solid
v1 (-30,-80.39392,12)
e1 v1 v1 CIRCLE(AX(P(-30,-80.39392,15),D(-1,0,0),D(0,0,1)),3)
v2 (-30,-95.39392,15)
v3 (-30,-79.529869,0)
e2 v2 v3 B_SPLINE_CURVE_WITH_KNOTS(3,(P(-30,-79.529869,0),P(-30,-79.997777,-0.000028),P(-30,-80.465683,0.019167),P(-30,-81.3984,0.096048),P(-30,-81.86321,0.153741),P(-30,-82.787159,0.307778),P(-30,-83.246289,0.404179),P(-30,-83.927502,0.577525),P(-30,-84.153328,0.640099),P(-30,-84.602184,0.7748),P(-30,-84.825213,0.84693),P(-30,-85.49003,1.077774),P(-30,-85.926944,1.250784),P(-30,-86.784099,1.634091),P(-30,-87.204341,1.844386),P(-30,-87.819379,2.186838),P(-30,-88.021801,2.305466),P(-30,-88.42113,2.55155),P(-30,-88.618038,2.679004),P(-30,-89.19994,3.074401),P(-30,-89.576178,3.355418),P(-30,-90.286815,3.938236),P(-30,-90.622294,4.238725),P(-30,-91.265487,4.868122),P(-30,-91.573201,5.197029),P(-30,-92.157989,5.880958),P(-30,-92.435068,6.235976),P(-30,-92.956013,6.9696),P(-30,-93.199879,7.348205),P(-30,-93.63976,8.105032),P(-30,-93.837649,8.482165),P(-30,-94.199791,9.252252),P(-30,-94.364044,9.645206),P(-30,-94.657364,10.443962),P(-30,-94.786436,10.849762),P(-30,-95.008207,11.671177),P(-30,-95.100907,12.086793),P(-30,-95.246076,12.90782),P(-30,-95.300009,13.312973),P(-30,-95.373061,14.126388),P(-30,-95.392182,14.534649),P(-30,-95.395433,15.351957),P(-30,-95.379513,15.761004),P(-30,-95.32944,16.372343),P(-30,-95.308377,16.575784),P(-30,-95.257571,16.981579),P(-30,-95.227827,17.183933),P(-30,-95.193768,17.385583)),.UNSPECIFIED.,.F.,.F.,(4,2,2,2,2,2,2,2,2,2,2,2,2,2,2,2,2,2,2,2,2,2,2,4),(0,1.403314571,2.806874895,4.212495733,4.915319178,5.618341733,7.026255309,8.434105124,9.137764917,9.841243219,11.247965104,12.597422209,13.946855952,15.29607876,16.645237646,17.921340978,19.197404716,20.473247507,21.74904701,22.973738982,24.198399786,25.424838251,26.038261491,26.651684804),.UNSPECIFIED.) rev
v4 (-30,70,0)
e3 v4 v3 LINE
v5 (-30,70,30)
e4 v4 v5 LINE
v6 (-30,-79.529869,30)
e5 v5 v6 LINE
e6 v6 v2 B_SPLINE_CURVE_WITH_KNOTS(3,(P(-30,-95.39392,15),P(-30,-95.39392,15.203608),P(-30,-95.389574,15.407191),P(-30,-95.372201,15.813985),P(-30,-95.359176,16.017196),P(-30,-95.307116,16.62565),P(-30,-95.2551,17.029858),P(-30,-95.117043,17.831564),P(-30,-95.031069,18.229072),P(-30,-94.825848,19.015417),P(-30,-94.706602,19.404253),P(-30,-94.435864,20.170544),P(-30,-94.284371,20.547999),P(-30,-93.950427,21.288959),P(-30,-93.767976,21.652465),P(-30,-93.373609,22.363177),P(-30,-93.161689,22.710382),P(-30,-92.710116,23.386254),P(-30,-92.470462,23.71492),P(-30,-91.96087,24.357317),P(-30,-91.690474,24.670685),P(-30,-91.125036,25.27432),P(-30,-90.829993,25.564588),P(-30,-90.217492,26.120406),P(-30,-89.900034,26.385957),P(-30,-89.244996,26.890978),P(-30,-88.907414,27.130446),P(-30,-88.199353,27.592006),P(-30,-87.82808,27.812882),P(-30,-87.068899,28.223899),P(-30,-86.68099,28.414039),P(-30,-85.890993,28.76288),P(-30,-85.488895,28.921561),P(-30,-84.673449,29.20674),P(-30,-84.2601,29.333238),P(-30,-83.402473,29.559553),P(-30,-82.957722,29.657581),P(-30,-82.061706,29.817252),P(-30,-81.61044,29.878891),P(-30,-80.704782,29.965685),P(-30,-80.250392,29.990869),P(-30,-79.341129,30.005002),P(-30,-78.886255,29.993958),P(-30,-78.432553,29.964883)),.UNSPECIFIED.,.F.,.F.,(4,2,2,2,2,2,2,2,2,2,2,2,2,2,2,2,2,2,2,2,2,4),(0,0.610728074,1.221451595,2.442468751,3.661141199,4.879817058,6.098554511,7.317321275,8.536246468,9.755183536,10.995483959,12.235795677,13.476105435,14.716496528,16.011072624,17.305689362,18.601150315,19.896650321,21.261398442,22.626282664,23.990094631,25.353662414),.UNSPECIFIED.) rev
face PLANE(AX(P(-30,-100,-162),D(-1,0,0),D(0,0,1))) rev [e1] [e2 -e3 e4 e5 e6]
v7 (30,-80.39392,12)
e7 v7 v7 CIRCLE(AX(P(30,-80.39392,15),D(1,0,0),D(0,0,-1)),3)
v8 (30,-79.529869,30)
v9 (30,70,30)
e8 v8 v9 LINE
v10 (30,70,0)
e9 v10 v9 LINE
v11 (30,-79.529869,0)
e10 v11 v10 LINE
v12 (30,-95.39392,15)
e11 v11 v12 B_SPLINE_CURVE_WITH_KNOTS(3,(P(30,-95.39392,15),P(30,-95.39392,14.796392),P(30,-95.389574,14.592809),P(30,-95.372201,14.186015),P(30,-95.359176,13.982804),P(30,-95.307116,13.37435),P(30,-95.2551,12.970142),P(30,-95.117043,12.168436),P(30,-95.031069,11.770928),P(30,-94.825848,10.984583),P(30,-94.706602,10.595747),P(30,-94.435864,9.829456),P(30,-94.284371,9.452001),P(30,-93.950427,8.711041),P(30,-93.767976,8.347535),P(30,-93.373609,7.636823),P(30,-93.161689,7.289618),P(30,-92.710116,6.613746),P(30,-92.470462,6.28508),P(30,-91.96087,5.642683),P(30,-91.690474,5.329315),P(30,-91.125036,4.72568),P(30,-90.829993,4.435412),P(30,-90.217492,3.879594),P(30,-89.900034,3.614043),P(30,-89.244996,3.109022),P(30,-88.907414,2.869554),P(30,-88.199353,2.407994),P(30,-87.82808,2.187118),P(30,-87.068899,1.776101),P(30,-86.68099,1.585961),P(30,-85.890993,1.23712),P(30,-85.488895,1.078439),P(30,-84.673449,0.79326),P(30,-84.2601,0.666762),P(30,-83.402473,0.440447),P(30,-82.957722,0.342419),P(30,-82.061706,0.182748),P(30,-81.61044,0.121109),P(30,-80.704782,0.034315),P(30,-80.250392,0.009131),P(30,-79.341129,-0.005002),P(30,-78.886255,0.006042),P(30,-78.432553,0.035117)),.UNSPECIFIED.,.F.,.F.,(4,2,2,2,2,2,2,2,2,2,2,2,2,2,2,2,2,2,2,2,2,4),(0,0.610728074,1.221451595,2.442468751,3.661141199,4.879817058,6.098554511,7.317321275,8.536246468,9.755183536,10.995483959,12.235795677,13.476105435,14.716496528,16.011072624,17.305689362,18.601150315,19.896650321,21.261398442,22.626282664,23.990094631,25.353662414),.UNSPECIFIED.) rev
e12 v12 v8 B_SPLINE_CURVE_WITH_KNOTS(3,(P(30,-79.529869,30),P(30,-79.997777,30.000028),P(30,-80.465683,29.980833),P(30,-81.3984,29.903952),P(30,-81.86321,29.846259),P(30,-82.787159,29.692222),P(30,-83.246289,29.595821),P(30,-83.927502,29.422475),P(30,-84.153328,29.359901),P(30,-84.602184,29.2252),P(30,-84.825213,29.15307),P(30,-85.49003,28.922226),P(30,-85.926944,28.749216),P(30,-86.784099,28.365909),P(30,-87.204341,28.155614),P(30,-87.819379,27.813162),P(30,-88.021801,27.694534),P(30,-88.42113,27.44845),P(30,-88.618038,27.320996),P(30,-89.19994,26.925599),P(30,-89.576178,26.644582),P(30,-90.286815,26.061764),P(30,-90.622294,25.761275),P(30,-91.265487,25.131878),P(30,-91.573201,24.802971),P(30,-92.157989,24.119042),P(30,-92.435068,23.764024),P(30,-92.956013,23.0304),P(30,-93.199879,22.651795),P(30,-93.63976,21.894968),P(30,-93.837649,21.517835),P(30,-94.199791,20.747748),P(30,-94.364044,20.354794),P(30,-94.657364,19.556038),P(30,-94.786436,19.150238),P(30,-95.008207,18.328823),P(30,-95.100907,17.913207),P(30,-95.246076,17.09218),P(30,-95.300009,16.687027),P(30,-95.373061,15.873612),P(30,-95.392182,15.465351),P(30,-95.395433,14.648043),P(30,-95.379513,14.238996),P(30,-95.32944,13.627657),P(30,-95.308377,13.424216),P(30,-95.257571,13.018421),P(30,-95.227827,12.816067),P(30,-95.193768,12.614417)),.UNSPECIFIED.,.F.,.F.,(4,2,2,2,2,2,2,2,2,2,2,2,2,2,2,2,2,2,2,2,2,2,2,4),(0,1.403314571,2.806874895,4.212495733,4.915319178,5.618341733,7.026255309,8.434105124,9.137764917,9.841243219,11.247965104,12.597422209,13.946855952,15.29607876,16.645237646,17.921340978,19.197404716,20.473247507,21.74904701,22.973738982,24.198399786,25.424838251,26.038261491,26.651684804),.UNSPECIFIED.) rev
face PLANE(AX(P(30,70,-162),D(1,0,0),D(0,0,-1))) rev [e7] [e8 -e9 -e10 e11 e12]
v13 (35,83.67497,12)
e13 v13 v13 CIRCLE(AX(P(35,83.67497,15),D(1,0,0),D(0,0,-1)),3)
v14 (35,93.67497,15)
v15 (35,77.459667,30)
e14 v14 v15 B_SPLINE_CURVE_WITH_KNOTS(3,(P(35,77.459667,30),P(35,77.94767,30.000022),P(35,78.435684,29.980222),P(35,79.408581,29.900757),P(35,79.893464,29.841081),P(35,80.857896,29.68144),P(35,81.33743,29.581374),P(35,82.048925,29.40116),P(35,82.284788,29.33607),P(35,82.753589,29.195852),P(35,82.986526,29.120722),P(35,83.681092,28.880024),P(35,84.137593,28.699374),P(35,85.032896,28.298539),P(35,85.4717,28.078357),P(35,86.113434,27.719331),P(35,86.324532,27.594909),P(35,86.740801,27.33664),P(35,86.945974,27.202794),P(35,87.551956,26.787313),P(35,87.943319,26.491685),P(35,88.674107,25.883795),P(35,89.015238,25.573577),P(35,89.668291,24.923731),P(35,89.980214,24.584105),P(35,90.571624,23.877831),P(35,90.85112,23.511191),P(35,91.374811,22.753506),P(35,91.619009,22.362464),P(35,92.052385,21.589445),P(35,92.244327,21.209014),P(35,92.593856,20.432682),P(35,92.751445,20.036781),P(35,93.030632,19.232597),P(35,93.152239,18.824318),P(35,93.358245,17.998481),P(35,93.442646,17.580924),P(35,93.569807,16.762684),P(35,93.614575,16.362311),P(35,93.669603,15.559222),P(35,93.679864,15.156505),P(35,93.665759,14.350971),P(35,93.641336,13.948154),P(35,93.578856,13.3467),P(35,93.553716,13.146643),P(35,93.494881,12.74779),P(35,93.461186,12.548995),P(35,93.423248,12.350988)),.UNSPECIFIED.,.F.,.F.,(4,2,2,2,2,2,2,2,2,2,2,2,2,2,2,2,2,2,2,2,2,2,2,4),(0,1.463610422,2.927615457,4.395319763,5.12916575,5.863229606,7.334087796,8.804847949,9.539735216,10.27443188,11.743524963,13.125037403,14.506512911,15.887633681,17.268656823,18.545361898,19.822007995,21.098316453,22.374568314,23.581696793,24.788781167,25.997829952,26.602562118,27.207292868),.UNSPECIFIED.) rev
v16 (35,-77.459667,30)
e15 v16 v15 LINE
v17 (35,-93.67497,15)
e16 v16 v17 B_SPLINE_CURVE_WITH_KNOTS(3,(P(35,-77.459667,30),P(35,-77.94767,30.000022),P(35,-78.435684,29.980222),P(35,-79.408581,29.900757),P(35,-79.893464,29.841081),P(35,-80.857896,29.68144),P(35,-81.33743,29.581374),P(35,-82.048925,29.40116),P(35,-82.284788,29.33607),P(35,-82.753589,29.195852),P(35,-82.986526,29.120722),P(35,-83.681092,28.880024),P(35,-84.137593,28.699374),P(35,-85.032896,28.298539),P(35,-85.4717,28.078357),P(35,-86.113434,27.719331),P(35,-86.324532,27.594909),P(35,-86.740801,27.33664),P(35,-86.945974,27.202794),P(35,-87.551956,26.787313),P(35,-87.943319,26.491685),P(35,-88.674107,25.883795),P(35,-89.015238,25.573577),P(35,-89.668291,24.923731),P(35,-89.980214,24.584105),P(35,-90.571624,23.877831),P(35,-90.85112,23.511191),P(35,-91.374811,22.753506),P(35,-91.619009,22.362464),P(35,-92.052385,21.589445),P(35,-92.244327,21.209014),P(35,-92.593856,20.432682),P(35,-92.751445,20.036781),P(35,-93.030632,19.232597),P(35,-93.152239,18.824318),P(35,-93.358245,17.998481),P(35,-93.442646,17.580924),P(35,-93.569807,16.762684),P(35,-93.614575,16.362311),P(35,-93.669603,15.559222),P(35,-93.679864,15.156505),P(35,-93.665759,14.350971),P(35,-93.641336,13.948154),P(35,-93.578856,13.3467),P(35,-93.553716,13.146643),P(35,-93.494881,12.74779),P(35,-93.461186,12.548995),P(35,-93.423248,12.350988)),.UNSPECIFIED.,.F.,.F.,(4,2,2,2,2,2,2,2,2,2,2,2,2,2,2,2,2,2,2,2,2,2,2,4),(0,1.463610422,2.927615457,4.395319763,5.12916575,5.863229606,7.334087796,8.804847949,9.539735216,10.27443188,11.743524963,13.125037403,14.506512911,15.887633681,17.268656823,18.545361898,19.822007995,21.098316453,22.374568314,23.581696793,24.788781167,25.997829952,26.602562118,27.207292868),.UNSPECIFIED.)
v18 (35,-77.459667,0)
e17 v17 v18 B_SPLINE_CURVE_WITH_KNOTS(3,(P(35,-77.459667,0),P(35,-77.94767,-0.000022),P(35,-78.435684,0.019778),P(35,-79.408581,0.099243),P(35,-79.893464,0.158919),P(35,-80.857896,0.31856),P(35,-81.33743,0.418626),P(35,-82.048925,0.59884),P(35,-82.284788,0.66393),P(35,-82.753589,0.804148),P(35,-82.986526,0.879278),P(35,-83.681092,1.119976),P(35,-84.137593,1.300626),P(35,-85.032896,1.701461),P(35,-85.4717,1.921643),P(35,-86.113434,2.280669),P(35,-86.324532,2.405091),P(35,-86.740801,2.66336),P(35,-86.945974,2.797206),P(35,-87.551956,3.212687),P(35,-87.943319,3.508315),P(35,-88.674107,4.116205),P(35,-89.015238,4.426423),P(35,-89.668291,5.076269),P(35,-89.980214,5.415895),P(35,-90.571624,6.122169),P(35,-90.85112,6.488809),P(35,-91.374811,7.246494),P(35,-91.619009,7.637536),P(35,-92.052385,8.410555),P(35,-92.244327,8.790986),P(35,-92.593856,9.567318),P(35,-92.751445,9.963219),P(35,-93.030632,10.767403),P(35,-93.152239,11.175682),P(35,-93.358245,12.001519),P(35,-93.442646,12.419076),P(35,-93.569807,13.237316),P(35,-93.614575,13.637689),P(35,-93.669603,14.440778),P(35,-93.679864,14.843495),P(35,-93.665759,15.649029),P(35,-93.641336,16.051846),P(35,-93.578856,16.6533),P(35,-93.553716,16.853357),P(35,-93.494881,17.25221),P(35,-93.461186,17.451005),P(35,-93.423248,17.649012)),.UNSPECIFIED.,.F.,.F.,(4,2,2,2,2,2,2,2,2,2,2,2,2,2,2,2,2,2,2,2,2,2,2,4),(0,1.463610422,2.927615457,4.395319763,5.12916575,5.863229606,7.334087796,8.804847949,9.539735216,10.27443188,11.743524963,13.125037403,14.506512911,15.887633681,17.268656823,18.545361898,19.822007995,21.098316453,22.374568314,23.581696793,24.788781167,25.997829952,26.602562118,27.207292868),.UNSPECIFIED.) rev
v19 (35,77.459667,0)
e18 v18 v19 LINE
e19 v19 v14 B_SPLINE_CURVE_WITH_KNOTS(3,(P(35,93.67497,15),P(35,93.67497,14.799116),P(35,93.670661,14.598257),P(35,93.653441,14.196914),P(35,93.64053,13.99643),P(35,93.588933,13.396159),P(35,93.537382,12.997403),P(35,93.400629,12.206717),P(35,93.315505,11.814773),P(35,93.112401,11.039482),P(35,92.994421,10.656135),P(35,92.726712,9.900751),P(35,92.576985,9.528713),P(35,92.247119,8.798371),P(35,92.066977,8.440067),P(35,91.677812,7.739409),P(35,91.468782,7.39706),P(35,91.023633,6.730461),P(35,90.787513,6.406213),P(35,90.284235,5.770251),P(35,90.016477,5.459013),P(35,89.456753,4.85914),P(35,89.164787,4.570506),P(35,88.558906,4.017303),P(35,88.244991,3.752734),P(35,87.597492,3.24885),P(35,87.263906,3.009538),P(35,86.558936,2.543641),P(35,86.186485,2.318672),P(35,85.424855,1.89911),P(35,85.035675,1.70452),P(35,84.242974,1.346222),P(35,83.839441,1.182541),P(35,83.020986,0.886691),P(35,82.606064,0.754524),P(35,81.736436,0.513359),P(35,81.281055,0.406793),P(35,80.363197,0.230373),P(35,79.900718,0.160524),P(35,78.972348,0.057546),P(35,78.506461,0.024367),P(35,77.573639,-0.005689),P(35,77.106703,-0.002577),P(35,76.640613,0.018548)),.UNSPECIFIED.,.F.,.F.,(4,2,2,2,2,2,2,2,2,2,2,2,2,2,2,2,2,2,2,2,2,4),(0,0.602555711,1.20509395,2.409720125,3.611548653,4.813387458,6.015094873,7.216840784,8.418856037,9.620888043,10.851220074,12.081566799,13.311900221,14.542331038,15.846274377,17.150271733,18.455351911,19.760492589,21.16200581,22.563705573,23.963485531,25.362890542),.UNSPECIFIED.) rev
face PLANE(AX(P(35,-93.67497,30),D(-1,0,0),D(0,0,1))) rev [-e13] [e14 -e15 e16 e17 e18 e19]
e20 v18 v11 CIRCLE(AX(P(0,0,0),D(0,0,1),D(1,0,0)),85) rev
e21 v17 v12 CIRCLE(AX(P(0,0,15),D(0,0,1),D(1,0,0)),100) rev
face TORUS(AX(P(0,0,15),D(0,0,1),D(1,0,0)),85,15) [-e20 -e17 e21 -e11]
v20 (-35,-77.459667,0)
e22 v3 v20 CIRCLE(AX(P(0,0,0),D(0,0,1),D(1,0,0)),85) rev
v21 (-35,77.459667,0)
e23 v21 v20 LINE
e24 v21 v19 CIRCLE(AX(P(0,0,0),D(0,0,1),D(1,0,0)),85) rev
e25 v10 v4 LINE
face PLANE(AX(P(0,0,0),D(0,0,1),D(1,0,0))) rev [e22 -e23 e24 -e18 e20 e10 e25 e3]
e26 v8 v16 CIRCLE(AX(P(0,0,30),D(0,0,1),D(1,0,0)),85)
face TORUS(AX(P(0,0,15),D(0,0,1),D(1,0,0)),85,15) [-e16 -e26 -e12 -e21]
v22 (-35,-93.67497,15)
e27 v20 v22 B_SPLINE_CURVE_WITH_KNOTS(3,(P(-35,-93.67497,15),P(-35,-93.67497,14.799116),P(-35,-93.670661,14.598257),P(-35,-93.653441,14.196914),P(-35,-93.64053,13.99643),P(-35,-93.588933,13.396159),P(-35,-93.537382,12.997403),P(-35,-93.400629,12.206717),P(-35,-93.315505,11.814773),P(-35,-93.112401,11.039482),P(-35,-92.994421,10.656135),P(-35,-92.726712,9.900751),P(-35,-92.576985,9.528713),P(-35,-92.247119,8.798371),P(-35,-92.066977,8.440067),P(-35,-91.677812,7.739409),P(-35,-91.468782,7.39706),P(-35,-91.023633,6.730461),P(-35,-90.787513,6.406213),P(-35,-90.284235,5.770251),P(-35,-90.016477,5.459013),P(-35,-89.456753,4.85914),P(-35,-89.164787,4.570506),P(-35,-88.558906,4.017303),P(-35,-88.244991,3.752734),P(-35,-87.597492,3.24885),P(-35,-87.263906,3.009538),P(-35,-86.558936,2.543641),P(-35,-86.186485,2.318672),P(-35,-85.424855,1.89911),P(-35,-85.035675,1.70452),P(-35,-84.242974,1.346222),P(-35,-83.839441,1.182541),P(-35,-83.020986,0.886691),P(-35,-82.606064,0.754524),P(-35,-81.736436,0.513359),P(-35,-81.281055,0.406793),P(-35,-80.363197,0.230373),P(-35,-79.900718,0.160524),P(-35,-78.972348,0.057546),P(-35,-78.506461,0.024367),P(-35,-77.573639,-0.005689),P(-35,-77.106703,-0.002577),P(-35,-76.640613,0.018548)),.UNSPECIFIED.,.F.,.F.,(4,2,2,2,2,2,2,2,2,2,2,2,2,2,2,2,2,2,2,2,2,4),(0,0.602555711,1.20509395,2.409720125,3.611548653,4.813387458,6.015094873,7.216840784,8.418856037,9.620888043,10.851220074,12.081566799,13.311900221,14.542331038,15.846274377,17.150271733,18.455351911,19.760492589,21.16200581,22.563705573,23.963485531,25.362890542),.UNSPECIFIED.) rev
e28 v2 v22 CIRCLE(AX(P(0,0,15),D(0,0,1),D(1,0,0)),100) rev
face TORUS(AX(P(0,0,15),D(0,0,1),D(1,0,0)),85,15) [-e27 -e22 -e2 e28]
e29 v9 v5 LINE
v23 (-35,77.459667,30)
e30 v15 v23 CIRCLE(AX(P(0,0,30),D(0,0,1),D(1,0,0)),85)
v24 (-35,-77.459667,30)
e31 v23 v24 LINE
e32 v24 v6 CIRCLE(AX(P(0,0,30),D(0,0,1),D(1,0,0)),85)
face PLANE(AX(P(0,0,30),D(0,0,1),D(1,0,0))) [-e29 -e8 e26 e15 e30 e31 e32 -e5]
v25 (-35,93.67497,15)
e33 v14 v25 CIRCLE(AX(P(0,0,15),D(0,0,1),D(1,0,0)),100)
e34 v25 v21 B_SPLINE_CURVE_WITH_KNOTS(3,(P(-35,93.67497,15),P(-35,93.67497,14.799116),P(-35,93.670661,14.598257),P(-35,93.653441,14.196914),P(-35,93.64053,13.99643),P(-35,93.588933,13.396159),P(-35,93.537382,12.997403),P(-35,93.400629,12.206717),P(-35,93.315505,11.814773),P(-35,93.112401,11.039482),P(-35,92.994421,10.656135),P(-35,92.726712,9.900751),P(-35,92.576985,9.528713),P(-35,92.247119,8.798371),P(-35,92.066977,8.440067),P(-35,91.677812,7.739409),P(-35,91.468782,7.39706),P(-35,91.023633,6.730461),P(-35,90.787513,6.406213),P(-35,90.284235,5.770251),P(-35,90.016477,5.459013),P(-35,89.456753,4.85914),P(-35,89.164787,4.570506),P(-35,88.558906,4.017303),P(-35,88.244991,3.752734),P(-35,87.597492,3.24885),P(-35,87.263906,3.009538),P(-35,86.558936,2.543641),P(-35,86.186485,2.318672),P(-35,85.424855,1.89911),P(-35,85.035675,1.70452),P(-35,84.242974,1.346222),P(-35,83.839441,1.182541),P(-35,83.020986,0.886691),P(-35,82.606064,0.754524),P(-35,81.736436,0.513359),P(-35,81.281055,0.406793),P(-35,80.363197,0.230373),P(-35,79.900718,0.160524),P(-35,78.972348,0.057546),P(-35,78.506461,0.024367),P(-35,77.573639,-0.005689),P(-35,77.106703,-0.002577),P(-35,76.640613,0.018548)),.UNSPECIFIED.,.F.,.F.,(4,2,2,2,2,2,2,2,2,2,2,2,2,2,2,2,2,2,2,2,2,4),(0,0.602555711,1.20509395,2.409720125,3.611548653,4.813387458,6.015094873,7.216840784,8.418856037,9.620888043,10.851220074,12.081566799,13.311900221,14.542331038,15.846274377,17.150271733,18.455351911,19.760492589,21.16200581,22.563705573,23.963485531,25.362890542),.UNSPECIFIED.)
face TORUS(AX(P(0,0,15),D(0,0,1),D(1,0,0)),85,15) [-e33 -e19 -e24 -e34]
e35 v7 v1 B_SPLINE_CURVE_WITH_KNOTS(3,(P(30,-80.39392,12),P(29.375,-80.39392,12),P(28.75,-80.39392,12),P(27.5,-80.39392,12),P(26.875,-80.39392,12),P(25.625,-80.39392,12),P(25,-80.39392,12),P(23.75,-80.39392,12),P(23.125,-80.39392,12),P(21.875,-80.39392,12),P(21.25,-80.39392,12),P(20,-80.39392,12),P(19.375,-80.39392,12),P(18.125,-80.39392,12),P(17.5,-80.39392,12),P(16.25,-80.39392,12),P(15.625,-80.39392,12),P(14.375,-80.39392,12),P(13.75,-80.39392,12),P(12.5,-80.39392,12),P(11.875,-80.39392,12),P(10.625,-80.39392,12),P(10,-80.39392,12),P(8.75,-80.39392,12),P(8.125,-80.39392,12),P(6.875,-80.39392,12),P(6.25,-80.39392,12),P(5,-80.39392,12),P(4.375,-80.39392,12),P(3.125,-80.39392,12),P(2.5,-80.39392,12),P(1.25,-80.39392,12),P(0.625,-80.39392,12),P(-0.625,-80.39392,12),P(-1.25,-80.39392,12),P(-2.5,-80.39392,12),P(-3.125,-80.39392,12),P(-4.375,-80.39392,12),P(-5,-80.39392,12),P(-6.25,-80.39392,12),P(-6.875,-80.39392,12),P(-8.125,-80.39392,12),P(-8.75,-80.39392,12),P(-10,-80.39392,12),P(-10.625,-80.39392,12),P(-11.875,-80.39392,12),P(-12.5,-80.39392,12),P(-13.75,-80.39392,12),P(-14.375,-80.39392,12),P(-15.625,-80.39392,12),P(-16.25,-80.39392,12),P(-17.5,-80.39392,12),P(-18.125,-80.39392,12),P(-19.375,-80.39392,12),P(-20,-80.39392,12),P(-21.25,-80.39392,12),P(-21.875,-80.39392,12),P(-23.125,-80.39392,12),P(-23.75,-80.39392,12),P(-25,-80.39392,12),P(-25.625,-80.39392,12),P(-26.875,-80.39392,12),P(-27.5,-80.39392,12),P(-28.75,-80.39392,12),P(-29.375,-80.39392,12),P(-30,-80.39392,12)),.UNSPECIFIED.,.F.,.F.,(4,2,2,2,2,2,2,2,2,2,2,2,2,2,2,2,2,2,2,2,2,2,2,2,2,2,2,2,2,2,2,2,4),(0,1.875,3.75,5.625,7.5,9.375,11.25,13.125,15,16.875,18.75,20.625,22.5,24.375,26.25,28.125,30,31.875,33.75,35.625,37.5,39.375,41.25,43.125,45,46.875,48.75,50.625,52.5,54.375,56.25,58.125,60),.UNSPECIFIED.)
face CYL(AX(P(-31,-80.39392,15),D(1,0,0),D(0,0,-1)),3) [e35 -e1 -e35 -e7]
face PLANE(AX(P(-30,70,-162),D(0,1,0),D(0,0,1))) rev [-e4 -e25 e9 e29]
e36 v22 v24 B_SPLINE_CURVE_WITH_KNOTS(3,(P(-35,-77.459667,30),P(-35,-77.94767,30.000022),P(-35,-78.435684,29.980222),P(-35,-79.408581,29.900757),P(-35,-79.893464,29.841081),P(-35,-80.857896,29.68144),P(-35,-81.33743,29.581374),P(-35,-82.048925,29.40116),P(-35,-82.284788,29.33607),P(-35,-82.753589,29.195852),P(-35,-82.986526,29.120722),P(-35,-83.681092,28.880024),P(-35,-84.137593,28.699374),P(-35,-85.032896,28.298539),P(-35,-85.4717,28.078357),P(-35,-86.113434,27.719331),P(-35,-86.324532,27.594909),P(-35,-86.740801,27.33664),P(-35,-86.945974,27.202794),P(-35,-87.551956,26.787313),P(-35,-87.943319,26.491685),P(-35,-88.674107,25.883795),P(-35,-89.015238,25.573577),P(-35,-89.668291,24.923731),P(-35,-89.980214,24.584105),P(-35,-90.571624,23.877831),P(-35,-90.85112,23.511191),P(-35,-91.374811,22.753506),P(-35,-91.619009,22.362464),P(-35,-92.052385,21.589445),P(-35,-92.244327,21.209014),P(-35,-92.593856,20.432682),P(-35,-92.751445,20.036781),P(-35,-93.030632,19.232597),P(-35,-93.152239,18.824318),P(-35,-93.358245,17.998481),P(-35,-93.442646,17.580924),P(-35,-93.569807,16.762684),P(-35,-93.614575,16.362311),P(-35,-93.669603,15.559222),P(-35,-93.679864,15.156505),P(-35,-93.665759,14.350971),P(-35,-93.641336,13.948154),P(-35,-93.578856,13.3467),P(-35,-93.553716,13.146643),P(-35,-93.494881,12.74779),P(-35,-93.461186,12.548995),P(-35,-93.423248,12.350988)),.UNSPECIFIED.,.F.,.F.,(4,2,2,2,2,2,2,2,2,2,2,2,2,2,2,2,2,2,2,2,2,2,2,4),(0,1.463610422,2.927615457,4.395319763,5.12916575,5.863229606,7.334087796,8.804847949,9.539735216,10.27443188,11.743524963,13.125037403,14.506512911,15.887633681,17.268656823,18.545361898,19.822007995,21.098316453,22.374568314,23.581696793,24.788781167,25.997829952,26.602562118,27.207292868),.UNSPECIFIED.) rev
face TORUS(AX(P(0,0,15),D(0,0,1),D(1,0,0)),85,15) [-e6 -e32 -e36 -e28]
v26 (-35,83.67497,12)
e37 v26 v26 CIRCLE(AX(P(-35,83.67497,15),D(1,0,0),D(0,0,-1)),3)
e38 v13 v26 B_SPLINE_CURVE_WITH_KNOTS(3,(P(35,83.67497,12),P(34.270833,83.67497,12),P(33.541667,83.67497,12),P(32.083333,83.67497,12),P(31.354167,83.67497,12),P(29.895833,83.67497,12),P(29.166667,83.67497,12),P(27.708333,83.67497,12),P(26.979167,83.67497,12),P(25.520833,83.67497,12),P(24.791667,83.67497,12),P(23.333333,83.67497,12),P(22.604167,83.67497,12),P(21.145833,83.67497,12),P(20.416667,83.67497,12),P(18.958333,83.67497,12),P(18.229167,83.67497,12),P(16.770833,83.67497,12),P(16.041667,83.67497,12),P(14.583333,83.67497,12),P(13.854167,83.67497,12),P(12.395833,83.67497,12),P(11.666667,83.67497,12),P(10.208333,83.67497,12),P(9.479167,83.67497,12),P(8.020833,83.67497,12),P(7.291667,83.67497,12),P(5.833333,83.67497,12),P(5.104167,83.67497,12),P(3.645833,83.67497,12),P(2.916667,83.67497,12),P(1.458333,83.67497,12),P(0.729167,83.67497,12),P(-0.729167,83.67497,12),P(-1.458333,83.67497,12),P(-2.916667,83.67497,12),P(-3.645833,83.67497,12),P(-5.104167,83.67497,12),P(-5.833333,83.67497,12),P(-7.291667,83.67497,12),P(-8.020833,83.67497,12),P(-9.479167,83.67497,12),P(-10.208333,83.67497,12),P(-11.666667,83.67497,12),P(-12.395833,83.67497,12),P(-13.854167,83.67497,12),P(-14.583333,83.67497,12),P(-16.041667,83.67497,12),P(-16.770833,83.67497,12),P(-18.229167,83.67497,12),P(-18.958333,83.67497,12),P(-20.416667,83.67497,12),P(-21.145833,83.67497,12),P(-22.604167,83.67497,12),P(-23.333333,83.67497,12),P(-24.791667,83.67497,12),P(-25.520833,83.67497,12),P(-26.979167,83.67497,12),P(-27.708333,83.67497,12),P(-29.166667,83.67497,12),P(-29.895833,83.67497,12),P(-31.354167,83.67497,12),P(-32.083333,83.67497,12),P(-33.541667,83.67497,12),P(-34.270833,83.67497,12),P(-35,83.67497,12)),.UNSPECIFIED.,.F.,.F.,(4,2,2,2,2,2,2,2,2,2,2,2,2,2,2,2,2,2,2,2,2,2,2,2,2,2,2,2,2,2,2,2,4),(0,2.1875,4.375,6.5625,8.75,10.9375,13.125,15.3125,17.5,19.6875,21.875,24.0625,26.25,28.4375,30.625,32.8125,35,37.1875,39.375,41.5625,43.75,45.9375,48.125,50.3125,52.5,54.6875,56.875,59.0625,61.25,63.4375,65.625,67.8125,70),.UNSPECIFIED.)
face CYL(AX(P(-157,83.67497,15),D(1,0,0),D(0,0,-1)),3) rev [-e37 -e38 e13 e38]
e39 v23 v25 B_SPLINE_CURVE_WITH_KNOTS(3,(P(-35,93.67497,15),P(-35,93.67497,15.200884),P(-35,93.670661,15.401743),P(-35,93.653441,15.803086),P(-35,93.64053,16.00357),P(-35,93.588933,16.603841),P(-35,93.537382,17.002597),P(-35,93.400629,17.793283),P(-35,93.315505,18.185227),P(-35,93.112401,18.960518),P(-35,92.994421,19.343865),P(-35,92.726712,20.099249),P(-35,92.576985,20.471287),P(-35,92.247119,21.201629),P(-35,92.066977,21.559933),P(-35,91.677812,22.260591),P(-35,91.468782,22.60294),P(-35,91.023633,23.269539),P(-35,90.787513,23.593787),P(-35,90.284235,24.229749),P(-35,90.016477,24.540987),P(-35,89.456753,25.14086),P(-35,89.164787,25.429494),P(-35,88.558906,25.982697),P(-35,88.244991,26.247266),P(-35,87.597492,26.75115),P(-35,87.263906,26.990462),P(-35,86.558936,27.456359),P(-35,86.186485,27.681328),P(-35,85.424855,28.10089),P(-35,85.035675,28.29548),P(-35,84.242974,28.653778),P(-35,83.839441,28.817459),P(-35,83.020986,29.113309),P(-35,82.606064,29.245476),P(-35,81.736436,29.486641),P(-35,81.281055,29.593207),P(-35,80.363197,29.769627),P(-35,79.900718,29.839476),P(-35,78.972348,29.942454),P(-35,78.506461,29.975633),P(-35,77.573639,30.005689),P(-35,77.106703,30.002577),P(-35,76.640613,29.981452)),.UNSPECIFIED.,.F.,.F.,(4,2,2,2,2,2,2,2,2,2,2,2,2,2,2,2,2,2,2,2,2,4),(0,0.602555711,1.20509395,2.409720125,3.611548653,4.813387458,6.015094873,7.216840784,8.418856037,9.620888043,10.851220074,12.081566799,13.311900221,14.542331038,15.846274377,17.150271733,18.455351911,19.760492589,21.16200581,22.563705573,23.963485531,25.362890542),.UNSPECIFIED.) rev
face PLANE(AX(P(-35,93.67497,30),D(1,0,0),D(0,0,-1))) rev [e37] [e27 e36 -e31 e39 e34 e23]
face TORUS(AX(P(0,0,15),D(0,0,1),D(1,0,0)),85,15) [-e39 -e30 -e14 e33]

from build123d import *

# Parameters (mm, degrees)
EXTRUDE_1_DEPTH     = 30
SKETCH_2_R          = 3
CUT_EXTRUDE_1_DEPTH = 192
FILLET_1_R          = 15
CUT_EXTRUDE_2_DEPTH = 192
SKETCH_4_R          = 3
EXTRUDE_2_DEPTH     = 66
FILLET_2_R          = 15
FILLET_3_R          = 15
FILLET_4_R          = 15
FILLET_5_R          = 15
FILLET_8_ANGLE      = 6.858136


with BuildPart() as part:
    # 草图1 → 凸台-拉伸1 (new body)
    with BuildSketch(Plane.XY):
        with BuildLine():
            Line((35, -93.674969976), (35, 93.674969976))
            ThreePointArc((35, 93.674969976), (0, 100), (-35, 93.674969976))
            Line((-35, 93.674969976), (-35, -93.674969976))
            ThreePointArc((-35, -93.674969976), (0, -100), (35, -93.674969976))
        make_face()
    extrude(amount=EXTRUDE_1_DEPTH)

    # 草图2 → 切除-拉伸1 (cut)
    with BuildSketch(Plane(origin=(35, 0, 0), x_dir=(0, 0, -1), z_dir=(1, 0, 0))):
        with Locations((-15, 83.674969976)):
            Circle(SKETCH_2_R)
    extrude(amount=-CUT_EXTRUDE_1_DEPTH, mode=Mode.SUBTRACT)

    # 圆角1
    fillet_1_edges = [part.edges().sort_by_distance(p)[0] for p in [
        (0, 100, 0),
    ]]
    fillet(fillet_1_edges, radius=FILLET_1_R)

    # 草图3 → 切除-拉伸2 (cut)
    with BuildSketch(Plane.XY.offset(30)):
        Polygon((0, -100), (-30, -100), (-30, 70), (30, 70), (30, -100), align=None)
    extrude(amount=-CUT_EXTRUDE_2_DEPTH, mode=Mode.SUBTRACT)

    # 草图4 → 凸台-拉伸2 (add)
    with BuildSketch(Plane(origin=(35, 0, 0), x_dir=(0, 0, -1), z_dir=(1, 0, 0))):
        with Locations((-15, -80.393920142)):
            Circle(SKETCH_4_R)
    extrude(amount=-EXTRUDE_2_DEPTH)

    # 圆角2
    fillet_2_edges = [part.edges().sort_by_distance(p)[0] for p in [
        (0, 100, 30),
    ]]
    fillet(fillet_2_edges, radius=FILLET_2_R - 0.0001)  # a hair under: the kernel refuses the full size

    # 圆角3
    # the kernel refuses this fillet: 15 mm, written as the material it takes off along each edge
    with BuildSketch(Plane(origin=(0, 0, 30), x_dir=(-0.07024960756428812, -0.9975294444962832, 0), z_dir=(-0.9975294444962832, 0.07024960756428812, 0))) as fillet_3_piece_1:
        with BuildLine():
            CenterArc((100 - FILLET_3_R, -FILLET_3_R), FILLET_3_R, 0, 90)
            Line((100, -FILLET_3_R), (100, 0))
            Line((100, 0), (100 - FILLET_3_R, 0))
        make_face()
    revolve(axis=Axis((0, 0, 30), (0, 0, 1)), revolution_arc=46.001566182, mode=Mode.SUBTRACT)

    # 圆角4
    # the kernel refuses this fillet: 15 mm, written as the material it takes off along each edge
    with BuildSketch(Plane(origin=(0, 0, 0), x_dir=(-0.07024960756429688, -0.9975294444962826, 0), z_dir=(-0.9975294444962826, 0.07024960756429688, 0))) as fillet_4_piece_1:
        with BuildLine():
            CenterArc((100 - FILLET_4_R, FILLET_4_R), FILLET_4_R, 270, 90)
            Line((100, FILLET_4_R), (100, 0))
            Line((100, 0), (100 - FILLET_4_R, 0))
        make_face()
    revolve(axis=Axis((0, 0, 0), (0, 0, 1)), revolution_arc=46.001566182, mode=Mode.SUBTRACT)

    # 圆角5
    # the kernel refuses this fillet: 15 mm, written as the material it takes off along each edge
    with BuildSketch(Plane(origin=(0, 0, 30), x_dir=(-0.668783476201052, -0.7434572361342896, 0), z_dir=(-0.7434572361342896, 0.668783476201052, 0))) as fillet_5_piece_1:
        with BuildLine():
            CenterArc((100 - FILLET_5_R, -FILLET_5_R), FILLET_5_R, 0, 90)
            Line((100 - FILLET_5_R, 0), (100, 0))
            Line((100, 0), (100, -FILLET_5_R))
        make_face()
    revolve(axis=Axis((0, 0, 30), (0, 0, 1)), revolution_arc=46.001566182, mode=Mode.SUBTRACT)

    # 圆角8: read off the stored shape, not the designer's step
    # 圆角8 outline → 圆角8 (revolve, cut)
    with BuildSketch(Plane(origin=(0, 0, 0), x_dir=(-0.4117647058823542, -0.911290199107627, 0), z_dir=(-0.911290199107627, 0.4117647058823542, 0))):
        with BuildLine():
            ThreePointArc((100, 15), (95.606601718, 4.393398282), (85, 0))
            Line((85, 0), (100, 0))
            Line((100, 0), (100, 15))
        make_face()
    revolve(axis=Axis((0, 0, 0), (0, 0, 1)), revolution_arc=FILLET_8_ANGLE, mode=Mode.SUBTRACT)


solid = part.part
